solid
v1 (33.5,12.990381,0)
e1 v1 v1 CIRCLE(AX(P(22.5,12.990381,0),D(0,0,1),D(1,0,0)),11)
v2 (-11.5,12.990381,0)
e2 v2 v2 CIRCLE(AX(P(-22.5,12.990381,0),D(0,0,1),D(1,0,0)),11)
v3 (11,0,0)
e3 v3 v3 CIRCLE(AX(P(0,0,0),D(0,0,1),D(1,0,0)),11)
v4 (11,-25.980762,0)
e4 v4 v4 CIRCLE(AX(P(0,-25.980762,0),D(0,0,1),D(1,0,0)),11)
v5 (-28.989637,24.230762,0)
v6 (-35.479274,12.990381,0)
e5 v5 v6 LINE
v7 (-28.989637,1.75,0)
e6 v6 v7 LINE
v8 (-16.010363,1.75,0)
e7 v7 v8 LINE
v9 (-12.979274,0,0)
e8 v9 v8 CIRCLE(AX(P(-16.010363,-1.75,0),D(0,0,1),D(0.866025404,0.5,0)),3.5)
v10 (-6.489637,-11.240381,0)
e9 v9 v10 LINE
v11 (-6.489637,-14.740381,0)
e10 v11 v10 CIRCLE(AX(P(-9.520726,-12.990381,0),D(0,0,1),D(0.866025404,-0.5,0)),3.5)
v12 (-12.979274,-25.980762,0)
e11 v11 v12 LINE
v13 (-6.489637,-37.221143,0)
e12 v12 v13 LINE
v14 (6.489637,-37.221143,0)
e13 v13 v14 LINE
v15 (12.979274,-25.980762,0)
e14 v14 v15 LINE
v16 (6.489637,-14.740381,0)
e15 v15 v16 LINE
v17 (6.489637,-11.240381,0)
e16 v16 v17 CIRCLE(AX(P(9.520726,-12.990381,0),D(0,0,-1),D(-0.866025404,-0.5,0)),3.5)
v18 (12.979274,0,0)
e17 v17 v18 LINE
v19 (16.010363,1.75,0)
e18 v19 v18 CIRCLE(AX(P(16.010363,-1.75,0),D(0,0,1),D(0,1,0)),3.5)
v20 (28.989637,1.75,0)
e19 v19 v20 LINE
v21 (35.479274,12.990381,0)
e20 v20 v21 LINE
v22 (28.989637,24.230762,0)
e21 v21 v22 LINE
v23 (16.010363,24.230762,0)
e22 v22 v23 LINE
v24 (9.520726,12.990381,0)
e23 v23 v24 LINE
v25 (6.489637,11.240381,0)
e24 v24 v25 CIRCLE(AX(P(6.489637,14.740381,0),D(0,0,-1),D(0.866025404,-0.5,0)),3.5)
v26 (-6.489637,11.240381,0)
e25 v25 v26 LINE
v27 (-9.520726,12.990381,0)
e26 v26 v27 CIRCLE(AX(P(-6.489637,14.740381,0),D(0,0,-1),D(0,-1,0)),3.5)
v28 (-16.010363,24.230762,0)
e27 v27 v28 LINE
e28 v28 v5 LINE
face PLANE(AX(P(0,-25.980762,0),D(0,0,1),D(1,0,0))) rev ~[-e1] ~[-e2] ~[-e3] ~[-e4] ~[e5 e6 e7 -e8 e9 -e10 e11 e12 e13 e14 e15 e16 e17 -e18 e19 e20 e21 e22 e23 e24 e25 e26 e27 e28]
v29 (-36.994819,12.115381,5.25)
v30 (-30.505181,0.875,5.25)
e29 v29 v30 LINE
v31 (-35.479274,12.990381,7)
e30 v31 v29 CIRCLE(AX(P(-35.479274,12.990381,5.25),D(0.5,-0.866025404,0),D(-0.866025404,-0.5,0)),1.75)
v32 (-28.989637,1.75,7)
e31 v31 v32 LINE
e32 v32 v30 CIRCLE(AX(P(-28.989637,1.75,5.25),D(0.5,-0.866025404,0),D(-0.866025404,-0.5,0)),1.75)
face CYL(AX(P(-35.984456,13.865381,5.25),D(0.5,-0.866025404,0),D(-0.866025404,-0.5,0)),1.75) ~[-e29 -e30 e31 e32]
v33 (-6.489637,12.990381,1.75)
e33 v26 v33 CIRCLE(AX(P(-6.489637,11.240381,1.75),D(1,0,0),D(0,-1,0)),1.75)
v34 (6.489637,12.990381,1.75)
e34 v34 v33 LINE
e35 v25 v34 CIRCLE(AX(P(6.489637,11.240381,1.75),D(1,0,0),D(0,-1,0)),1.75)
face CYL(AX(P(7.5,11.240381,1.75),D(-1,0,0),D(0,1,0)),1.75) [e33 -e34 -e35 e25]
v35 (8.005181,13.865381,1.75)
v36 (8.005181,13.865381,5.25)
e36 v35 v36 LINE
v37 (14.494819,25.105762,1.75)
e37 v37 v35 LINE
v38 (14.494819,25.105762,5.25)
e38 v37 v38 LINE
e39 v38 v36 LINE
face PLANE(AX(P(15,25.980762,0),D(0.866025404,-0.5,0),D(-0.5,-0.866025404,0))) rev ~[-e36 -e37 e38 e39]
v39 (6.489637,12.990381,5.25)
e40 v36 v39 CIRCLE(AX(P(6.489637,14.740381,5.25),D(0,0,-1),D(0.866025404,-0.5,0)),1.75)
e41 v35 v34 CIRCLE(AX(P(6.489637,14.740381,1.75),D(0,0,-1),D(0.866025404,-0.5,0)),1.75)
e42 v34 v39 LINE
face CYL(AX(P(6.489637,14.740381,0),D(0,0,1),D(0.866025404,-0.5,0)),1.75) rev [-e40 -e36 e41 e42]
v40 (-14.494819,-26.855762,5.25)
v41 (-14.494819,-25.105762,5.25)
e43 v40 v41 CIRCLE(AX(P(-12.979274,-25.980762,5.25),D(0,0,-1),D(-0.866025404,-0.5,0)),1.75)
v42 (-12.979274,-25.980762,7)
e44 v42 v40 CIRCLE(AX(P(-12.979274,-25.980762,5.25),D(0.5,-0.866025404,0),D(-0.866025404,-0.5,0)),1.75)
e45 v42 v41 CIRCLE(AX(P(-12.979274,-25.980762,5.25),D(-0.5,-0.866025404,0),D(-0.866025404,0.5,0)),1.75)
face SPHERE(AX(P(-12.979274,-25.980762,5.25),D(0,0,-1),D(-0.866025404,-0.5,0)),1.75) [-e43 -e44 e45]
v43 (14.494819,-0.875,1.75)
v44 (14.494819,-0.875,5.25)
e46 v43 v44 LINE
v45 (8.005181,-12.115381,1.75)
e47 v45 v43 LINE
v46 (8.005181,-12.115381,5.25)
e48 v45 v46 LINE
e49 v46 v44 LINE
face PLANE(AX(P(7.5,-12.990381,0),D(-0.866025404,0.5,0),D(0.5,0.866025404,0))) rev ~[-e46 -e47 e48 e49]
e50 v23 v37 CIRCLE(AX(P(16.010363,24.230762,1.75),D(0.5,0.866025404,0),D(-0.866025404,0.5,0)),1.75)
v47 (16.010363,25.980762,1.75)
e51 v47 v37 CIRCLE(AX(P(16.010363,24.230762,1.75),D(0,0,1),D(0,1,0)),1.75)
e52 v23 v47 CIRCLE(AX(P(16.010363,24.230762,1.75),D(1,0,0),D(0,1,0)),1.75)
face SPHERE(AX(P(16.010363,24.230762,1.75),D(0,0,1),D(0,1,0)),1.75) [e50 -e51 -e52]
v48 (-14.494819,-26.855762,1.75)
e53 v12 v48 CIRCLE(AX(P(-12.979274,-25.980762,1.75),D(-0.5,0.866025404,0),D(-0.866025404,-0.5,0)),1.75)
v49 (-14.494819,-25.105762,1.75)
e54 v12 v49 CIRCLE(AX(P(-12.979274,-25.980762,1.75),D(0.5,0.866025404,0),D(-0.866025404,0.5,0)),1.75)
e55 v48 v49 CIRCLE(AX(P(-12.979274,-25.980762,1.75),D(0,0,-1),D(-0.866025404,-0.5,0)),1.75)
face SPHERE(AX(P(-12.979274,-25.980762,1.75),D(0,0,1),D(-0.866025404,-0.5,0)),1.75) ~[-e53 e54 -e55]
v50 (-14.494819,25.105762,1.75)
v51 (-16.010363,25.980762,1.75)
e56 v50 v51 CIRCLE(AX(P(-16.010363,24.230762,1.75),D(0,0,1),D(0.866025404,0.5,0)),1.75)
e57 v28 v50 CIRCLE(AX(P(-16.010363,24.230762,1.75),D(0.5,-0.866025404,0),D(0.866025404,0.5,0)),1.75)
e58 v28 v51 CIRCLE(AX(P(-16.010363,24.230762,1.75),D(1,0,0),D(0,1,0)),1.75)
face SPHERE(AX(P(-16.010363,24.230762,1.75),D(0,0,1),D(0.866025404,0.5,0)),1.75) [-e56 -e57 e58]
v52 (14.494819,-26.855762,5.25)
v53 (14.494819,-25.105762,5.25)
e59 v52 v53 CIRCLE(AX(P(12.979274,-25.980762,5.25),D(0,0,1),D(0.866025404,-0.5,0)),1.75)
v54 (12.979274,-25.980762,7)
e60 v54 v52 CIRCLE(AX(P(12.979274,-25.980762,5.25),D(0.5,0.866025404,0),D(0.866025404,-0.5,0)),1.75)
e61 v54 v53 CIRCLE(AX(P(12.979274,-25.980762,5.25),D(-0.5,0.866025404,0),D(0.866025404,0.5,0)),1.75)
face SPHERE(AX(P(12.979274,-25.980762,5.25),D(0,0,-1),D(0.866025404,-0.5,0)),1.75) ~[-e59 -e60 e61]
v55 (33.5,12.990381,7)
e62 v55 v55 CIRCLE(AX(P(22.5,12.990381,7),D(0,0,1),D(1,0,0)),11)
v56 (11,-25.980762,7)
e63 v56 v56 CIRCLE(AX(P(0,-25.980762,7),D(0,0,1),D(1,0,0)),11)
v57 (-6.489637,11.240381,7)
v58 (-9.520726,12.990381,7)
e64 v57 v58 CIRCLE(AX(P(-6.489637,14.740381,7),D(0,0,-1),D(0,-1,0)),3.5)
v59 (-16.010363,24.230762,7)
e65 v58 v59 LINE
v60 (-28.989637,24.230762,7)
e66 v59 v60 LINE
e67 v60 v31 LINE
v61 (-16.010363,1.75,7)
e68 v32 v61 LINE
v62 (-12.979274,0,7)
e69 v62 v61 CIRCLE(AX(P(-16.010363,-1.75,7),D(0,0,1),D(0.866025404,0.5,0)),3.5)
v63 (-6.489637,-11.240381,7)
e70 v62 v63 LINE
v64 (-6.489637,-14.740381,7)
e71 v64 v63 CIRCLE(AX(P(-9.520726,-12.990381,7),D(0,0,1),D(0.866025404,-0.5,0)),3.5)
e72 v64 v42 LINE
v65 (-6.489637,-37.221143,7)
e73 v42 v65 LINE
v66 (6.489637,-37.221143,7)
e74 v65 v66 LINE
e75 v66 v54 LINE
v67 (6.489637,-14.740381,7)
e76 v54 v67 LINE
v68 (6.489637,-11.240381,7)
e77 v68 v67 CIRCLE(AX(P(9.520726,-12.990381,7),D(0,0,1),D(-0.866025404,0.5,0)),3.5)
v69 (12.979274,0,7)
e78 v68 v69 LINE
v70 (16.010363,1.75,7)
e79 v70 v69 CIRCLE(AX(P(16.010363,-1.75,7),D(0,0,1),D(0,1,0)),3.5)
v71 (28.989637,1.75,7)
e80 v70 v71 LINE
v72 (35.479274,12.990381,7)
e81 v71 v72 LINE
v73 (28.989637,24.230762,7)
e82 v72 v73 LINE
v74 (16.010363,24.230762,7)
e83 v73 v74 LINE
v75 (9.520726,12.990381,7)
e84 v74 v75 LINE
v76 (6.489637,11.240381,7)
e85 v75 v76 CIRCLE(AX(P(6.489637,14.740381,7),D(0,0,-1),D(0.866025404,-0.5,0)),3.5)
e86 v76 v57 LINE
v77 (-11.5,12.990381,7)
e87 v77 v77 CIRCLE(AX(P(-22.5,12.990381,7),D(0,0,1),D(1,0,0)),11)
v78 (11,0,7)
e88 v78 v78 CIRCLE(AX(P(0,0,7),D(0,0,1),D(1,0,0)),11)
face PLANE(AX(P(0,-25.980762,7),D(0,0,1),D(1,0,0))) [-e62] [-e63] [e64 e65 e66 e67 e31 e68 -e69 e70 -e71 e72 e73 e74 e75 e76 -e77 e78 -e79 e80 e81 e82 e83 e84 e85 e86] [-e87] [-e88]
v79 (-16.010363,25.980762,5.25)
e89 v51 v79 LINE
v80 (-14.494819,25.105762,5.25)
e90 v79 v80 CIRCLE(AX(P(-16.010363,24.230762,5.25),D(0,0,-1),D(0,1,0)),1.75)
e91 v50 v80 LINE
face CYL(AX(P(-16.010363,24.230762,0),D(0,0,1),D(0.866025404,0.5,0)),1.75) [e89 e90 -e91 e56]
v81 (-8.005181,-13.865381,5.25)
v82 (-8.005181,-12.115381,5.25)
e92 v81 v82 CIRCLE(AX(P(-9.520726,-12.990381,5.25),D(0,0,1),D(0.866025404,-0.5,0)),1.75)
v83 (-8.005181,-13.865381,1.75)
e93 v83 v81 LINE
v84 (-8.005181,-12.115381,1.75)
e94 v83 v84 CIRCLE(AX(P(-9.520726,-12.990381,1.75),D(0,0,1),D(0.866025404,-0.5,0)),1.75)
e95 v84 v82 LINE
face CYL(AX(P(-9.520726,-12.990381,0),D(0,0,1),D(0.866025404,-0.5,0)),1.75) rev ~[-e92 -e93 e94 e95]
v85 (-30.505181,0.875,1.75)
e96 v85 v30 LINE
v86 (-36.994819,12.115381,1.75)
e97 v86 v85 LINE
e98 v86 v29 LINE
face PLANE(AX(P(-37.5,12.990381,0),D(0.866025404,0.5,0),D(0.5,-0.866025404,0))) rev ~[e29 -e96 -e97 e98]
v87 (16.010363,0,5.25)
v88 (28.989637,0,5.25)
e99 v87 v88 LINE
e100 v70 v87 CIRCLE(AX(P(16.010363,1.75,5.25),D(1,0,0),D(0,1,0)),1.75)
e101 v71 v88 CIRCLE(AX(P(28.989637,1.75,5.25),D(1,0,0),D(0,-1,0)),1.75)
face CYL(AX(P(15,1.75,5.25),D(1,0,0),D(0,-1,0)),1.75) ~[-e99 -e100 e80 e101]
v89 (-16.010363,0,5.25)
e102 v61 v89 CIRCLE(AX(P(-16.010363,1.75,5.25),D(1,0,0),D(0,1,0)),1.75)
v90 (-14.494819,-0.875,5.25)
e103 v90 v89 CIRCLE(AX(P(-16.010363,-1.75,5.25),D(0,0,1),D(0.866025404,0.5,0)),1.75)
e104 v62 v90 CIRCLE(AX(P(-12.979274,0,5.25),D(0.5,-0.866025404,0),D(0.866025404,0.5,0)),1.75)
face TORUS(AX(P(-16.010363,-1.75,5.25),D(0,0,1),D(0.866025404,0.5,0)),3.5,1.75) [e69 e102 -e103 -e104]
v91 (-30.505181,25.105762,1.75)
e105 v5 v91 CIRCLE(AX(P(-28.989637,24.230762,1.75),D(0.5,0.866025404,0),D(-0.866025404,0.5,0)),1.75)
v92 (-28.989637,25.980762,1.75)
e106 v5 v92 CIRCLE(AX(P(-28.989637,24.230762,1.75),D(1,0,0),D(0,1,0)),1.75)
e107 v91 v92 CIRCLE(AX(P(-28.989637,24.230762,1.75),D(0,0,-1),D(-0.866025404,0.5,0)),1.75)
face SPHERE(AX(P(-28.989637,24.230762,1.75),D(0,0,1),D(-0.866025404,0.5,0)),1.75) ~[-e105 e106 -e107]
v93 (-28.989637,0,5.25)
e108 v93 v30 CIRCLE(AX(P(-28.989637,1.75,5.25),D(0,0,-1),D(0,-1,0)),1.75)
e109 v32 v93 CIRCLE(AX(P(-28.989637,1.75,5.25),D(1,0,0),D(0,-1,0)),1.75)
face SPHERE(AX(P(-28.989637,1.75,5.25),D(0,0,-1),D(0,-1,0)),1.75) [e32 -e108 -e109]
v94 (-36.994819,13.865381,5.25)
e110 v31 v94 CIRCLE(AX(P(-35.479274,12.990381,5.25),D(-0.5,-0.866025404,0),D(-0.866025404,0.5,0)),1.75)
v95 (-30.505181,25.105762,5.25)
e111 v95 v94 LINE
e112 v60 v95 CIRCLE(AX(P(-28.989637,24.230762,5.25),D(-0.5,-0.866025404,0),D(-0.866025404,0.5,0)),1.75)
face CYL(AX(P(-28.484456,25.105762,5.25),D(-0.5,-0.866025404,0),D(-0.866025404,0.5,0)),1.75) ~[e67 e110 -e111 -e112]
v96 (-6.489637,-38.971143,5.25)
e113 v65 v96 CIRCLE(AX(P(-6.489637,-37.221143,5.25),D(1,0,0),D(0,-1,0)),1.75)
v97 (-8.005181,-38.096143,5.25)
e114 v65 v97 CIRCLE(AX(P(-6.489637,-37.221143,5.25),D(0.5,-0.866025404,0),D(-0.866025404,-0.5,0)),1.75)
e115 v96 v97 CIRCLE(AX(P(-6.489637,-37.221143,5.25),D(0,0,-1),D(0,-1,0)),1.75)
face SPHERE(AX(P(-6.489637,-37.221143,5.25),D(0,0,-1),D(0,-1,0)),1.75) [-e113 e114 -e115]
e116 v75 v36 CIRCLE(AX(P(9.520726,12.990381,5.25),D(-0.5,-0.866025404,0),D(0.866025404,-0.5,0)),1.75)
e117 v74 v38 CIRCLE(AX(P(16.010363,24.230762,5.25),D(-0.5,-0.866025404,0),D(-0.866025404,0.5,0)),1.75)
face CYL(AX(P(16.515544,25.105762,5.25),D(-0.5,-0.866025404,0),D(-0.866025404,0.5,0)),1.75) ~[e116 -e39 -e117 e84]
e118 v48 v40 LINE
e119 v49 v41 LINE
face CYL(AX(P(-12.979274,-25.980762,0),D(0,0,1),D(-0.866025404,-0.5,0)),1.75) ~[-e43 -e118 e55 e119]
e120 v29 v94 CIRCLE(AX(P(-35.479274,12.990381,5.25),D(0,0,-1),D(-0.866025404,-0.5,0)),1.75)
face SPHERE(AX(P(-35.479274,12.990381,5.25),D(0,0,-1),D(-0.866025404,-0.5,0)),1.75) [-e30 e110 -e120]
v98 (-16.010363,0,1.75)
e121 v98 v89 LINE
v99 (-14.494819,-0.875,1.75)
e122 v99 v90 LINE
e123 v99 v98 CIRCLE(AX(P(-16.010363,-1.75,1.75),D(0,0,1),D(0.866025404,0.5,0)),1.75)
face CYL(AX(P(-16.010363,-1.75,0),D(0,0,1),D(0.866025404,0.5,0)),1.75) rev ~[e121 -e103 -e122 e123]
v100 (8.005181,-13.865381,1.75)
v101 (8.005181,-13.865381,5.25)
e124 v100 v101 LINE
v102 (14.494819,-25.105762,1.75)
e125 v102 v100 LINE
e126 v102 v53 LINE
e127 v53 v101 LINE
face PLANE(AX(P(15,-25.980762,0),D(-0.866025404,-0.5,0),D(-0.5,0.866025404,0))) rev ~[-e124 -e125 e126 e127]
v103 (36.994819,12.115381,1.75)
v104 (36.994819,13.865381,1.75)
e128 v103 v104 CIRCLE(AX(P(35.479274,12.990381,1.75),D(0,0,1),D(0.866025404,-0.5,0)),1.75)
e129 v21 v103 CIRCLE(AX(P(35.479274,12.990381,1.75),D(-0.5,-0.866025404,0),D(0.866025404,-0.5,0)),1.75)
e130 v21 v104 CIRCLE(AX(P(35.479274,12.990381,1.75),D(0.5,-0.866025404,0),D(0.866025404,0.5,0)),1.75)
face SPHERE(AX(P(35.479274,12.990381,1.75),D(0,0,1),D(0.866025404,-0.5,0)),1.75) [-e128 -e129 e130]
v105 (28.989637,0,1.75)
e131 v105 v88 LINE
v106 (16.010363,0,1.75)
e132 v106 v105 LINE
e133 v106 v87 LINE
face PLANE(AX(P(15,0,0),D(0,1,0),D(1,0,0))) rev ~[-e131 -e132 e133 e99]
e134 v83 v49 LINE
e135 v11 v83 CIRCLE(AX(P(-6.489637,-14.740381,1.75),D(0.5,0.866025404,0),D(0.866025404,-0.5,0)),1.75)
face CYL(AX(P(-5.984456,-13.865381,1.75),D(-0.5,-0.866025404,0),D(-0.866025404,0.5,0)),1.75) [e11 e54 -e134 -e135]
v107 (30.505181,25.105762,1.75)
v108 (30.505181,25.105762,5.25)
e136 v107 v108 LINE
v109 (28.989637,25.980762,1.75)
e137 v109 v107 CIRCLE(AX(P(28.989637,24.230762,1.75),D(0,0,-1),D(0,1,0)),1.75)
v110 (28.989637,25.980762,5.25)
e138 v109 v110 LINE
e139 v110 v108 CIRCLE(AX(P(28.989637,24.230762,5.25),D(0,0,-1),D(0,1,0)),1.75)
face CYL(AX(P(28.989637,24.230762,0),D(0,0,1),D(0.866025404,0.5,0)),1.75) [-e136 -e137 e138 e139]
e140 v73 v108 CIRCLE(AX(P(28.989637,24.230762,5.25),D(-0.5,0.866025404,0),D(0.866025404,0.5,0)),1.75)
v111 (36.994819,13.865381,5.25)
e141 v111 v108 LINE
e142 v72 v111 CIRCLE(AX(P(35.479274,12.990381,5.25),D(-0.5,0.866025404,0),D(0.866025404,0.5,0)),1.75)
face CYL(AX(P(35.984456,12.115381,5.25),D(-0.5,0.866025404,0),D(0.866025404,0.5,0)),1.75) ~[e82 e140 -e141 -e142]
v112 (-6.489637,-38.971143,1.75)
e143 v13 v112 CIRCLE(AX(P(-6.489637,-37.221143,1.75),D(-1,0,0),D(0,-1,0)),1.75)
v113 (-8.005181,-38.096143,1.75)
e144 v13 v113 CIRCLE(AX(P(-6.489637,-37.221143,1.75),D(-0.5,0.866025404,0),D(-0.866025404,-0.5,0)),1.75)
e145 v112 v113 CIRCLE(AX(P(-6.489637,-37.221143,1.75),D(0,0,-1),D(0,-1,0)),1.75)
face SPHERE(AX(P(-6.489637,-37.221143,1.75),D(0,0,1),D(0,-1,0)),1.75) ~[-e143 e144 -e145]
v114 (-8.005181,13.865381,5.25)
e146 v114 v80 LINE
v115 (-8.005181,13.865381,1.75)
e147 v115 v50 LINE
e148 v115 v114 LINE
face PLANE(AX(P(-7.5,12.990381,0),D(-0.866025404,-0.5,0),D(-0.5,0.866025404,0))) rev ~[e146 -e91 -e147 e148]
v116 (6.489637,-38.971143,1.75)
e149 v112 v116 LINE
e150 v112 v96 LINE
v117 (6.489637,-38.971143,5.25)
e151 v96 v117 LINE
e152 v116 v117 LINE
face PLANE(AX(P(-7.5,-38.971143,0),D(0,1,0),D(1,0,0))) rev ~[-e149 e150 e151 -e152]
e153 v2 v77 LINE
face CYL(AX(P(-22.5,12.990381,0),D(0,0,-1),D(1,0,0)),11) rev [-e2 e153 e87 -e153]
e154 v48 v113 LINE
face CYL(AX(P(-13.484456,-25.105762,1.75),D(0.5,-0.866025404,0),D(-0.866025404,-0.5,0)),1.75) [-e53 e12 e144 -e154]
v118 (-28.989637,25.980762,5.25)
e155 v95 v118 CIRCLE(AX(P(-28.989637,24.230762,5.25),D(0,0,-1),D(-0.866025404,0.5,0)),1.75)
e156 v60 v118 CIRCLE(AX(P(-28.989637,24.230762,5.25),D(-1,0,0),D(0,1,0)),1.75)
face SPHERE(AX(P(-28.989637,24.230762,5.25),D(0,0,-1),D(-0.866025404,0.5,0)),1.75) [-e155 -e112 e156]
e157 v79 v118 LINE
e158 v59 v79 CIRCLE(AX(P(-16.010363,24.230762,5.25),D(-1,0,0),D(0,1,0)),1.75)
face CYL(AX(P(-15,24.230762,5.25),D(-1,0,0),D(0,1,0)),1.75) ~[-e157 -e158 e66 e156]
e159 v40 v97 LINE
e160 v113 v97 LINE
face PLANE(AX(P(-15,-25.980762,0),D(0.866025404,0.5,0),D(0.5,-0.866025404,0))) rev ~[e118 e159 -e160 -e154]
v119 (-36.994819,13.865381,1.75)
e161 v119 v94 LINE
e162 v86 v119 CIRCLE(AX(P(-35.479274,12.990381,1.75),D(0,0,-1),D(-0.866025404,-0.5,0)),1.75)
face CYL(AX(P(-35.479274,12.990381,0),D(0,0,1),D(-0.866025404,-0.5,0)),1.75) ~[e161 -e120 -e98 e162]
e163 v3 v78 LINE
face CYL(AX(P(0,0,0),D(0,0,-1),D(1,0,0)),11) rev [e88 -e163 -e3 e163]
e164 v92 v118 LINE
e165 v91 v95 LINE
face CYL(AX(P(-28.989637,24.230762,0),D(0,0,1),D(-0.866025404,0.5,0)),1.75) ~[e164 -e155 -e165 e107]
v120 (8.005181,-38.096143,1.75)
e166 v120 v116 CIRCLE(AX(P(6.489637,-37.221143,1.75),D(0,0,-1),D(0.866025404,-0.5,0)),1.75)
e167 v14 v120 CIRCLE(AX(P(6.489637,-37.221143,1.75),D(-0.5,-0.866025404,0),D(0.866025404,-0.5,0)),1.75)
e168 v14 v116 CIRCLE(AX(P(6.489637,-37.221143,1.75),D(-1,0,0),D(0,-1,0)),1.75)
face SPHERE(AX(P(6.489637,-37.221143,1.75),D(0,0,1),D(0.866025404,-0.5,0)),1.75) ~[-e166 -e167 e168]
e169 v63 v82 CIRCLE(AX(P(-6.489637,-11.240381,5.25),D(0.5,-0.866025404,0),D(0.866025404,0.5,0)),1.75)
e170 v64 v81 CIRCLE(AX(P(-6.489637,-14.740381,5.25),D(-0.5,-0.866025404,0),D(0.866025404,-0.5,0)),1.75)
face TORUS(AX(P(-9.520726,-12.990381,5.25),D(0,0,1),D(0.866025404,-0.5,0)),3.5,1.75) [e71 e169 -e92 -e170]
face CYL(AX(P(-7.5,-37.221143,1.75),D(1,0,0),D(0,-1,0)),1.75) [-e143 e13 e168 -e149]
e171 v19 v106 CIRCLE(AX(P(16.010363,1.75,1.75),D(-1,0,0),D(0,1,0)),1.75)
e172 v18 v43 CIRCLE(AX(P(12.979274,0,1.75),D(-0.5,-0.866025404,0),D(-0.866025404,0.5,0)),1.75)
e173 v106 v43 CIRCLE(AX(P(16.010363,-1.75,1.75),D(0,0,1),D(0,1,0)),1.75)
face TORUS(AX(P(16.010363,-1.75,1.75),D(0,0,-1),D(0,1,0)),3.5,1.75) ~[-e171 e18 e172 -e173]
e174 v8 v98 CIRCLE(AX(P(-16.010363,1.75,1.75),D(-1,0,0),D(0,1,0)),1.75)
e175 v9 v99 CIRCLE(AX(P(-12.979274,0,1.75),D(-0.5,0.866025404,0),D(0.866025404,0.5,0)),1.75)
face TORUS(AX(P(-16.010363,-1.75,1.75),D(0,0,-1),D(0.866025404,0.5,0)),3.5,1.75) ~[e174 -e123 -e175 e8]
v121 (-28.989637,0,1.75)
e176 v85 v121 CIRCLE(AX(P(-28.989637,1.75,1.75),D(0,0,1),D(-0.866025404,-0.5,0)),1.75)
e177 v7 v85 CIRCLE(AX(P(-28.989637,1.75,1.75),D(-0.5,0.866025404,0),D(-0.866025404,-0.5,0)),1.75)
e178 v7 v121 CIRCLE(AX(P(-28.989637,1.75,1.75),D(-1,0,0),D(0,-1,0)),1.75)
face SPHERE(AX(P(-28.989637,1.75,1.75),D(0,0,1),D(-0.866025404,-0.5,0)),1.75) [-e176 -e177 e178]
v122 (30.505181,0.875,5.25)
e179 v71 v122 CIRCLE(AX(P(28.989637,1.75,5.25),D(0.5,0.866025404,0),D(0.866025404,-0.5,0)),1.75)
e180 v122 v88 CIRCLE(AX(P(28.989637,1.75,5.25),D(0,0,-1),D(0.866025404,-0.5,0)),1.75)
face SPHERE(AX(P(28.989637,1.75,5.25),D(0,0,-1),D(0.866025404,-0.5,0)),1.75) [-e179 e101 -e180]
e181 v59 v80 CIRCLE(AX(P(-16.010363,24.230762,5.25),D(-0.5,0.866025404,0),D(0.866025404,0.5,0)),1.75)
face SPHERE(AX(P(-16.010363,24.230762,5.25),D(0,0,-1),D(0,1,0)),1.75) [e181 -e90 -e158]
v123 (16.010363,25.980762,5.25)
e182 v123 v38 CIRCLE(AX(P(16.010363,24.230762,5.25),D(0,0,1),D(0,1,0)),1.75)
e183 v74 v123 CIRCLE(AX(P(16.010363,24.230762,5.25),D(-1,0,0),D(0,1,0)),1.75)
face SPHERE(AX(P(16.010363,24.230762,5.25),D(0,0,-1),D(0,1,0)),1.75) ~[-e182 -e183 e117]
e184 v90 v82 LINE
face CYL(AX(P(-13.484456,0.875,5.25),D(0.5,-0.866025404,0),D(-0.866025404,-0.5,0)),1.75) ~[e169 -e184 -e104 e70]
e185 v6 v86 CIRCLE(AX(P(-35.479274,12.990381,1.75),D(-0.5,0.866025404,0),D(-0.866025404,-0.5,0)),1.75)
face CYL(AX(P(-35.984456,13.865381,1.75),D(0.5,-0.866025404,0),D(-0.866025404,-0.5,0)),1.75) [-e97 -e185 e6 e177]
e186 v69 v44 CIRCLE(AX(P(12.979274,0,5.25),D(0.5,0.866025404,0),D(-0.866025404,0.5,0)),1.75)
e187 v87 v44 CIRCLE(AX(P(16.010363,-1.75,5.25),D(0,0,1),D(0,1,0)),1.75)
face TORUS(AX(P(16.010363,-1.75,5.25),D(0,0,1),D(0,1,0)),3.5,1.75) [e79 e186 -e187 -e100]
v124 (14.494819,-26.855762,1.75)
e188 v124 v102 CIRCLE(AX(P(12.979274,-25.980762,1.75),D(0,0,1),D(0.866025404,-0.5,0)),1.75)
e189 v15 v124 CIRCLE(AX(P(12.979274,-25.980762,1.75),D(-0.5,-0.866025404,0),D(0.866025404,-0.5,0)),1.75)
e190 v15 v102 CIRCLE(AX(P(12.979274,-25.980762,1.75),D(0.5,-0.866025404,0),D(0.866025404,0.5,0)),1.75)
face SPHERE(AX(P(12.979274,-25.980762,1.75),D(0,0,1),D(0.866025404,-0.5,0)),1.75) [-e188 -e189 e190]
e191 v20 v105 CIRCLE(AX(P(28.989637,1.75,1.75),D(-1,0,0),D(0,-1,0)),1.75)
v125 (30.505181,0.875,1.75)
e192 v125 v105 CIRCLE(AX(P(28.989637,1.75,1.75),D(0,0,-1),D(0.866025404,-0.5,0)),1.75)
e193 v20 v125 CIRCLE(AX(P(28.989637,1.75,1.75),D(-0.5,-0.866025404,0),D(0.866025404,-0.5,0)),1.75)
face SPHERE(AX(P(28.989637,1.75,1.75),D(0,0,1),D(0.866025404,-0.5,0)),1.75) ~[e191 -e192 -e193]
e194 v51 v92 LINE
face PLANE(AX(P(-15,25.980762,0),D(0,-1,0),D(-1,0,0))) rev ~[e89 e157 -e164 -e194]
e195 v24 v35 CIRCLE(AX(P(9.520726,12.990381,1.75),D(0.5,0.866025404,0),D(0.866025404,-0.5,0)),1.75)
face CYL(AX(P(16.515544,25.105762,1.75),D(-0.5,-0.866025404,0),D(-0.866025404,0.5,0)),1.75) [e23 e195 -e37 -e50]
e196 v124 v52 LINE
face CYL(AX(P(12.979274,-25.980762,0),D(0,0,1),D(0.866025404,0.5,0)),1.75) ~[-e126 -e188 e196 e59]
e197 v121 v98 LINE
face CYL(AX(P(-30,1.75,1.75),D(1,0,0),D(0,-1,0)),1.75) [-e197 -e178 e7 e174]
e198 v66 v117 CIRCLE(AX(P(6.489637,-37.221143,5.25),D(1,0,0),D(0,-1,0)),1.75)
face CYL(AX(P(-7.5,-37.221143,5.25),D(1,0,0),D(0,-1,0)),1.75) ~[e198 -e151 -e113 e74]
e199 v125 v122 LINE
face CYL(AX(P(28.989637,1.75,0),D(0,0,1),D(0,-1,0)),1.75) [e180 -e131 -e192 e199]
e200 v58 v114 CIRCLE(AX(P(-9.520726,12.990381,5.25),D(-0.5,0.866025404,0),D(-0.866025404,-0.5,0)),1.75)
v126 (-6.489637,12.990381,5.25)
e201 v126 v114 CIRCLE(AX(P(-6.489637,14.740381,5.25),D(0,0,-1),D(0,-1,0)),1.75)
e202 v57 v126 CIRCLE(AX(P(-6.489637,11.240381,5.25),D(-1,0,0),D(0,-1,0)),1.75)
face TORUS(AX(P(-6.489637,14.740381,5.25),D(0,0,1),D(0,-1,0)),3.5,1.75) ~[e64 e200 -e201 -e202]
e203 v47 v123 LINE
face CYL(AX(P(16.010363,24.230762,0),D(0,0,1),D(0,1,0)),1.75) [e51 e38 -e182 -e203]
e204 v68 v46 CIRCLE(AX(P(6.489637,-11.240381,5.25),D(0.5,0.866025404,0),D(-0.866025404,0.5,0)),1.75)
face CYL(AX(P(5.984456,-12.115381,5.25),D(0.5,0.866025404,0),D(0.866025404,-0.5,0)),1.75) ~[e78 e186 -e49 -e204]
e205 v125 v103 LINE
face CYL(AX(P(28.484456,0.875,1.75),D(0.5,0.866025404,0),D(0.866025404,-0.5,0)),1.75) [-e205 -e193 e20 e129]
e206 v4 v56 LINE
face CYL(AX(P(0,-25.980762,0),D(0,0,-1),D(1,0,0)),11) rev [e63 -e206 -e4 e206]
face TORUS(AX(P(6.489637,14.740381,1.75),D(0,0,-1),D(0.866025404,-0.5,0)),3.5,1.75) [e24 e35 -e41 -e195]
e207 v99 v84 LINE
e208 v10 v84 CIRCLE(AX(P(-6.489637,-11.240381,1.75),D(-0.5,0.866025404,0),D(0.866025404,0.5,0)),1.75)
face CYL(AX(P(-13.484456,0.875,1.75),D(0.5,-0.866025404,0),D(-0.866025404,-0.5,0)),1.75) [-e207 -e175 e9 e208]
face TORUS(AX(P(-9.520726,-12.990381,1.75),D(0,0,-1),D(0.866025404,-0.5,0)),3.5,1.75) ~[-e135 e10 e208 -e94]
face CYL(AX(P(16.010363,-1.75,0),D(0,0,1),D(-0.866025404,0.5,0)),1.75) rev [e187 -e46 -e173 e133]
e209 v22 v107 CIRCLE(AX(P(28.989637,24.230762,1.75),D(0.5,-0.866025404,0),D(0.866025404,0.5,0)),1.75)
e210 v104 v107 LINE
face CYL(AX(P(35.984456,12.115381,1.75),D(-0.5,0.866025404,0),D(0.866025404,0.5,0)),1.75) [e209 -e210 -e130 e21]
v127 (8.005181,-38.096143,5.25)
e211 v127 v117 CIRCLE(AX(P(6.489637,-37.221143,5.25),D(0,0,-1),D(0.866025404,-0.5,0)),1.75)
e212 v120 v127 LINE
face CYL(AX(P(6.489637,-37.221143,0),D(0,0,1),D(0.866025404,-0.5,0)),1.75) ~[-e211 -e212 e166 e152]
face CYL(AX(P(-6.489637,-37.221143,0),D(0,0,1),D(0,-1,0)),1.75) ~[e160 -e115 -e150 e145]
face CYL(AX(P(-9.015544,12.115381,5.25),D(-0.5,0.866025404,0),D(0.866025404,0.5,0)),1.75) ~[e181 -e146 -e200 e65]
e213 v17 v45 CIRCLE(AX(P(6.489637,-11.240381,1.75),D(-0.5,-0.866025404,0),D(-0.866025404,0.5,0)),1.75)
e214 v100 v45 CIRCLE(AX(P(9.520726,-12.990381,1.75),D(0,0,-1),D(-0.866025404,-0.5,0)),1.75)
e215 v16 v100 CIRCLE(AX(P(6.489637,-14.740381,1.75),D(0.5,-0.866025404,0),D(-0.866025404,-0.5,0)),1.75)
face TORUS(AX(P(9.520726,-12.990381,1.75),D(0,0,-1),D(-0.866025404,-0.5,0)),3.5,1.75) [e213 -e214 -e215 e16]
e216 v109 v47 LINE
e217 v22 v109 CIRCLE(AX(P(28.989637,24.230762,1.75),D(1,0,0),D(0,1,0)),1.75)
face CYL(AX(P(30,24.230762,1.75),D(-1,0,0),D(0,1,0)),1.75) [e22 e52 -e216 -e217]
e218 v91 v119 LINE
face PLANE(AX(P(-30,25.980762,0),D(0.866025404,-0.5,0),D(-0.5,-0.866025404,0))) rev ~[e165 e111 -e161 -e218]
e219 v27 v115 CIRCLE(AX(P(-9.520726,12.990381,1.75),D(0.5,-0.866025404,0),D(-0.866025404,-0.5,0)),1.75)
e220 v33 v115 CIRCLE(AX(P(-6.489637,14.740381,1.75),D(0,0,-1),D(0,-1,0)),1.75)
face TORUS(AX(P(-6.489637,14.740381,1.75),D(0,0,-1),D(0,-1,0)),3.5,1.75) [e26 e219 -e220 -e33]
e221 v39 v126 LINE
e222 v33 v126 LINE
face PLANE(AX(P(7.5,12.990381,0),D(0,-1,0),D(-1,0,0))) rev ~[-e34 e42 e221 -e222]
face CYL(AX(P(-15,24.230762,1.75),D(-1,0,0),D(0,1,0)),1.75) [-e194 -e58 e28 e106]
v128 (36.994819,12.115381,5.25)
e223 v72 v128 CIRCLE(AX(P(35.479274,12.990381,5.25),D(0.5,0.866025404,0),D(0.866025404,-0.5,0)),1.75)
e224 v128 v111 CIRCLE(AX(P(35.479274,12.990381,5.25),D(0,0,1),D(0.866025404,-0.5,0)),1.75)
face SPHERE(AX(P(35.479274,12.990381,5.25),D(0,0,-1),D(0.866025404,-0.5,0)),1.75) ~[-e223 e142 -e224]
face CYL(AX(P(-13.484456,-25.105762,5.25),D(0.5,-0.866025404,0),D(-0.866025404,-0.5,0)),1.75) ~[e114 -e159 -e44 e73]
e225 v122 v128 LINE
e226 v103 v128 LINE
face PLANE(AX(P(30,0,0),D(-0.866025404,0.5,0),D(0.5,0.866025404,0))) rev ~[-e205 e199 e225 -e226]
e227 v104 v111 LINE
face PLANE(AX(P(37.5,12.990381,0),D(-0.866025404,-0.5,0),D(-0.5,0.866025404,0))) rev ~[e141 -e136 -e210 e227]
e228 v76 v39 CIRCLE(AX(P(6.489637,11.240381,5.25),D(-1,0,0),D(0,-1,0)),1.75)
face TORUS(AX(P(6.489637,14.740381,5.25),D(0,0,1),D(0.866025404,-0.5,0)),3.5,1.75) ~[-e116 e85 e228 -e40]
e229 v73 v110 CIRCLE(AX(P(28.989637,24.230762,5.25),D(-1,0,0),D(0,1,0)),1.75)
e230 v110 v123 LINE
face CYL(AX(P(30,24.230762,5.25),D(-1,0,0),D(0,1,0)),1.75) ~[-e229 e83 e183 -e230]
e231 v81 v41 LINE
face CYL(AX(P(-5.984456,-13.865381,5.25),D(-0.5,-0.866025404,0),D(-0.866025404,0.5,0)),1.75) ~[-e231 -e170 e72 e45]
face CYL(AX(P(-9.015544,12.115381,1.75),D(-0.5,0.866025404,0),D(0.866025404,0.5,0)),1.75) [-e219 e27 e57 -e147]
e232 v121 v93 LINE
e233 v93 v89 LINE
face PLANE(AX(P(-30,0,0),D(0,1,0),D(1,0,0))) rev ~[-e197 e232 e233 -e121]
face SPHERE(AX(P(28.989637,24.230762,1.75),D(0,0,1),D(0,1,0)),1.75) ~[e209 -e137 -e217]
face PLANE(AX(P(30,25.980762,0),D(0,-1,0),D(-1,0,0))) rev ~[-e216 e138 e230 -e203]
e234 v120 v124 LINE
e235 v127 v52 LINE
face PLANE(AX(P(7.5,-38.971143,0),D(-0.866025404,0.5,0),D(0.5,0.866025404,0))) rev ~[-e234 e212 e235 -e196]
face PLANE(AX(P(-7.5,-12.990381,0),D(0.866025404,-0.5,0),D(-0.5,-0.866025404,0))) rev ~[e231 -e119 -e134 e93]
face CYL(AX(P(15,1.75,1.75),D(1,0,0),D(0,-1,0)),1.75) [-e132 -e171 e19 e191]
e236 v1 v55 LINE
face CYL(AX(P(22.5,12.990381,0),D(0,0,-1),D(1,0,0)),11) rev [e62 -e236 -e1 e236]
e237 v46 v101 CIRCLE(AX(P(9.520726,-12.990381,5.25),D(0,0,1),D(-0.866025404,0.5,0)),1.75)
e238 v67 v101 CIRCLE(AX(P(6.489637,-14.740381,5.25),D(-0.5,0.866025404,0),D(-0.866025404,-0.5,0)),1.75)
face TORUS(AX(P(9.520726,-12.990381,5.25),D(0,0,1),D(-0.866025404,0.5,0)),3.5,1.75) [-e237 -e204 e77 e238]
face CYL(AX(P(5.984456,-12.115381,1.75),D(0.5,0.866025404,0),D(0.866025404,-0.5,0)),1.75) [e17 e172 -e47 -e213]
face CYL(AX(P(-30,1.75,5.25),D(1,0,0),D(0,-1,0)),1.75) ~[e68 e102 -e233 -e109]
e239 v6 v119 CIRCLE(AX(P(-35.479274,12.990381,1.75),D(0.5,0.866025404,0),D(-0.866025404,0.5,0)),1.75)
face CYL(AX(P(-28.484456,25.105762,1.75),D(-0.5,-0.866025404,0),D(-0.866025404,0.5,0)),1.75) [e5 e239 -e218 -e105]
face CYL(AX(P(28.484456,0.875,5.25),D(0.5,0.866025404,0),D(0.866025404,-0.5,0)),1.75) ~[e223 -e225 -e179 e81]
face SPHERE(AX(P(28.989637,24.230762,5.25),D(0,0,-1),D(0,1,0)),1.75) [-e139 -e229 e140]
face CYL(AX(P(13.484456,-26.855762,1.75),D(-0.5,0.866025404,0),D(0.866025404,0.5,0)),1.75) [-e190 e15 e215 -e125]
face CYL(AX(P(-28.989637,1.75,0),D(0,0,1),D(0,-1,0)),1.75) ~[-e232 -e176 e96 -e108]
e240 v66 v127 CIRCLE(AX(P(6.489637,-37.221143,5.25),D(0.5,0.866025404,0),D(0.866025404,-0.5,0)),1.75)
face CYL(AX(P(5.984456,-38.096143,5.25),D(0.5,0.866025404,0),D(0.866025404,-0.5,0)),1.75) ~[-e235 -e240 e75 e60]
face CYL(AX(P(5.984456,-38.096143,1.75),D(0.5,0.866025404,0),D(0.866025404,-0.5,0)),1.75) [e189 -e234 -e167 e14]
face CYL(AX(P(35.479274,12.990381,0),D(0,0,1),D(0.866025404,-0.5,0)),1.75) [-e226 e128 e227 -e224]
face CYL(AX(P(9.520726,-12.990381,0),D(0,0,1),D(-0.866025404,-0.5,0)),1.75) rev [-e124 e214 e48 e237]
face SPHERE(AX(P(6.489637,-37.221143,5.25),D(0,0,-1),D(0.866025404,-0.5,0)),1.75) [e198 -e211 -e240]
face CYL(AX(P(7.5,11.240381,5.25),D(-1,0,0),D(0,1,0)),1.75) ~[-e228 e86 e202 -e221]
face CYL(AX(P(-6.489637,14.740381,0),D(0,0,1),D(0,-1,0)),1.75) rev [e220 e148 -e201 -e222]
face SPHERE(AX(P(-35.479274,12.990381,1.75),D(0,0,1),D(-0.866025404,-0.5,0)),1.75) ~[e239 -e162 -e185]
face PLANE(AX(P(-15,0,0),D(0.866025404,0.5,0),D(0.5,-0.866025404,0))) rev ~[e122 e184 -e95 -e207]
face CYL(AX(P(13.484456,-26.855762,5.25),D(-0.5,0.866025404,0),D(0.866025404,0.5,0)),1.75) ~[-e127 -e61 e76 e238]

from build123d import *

# Parameters (mm, degrees)
F0_R     = 11
F1_DEPTH = 7
F2_R     = 1.75


with BuildPart() as f1:
    # F0 (on Top) → F1 (new body)
    with BuildSketch(Plane.XY):
        Polygon((15, -25.9807621135), (7.5, -12.9903810568), (-7.5, -12.9903810568), (-15, -25.9807621135), (-7.5, -38.9711431703), (7.5, -38.9711431703), align=None)
        with Locations((0, -25.9807621135)):
            Circle(F0_R, mode=Mode.SUBTRACT)
        Polygon((-7.5, -12.9903810568), (7.5, -12.9903810568), (15, 0), (7.5, 12.9903810568), (-7.5, 12.9903810568), (-15, 0), align=None)
        Circle(F0_R, mode=Mode.SUBTRACT)
        Polygon((7.5, 12.9903810568), (15, 0), (30, 0), (37.5, 12.9903810568), (30, 25.9807621135), (15, 25.9807621135), align=None)
        with Locations((22.5, 12.9903810568)):
            Circle(F0_R, mode=Mode.SUBTRACT)
        Polygon((-30, 0), (-15, 0), (-7.5, 12.9903810568), (-15, 25.9807621135), (-30, 25.9807621135), (-37.5, 12.9903810568), align=None)
        with Locations((-22.5, 12.9903810568)):
            Circle(F0_R, mode=Mode.SUBTRACT)
    extrude(amount=F1_DEPTH)

    # F2
    f2_edges = [f1.edges().sort_by_distance(p)[0] for p in [
        (7.5, -38.971143, 3.5),
        (15, -25.980762, 3.5),
        (11.25, -32.475953, 0),
        (11.25, -32.475953, 7),
        (0, -38.971143, 7),
        (11.25, -19.485572, 7),
        (11.25, -19.485572, 0),
        (11.25, -6.495191, 0),
        (7.5, -12.990381, 3.5),
        (11.25, -6.495191, 7),
        (15, 0, 3.5),
        (22.5, 0, 0),
        (22.5, 0, 7),
        (30, 0, 3.5),
        (33.75, 6.495191, 0),
        (33.75, 6.495191, 7),
        (33.75, 19.485572, 0),
        (33.75, 19.485572, 7),
        (37.5, 12.990381, 3.5),
        (30, 25.980762, 3.5),
        (22.5, 25.980762, 7),
        (22.5, 25.980762, 0),
        (11.25, 19.485572, 7),
        (11.25, 19.485572, 0),
        (0, 12.990381, 7),
        (0, 12.990381, 0),
        (-11.25, 19.485572, 7),
        (-11.25, 19.485572, 0),
        (-22.5, 25.980762, 0),
        (-15, 25.980762, 3.5),
        (-22.5, 25.980762, 7),
        (-30, 25.980762, 3.5),
        (-33.75, 19.485572, 7),
        (-33.75, 19.485572, 0),
        (-37.5, 12.990381, 3.5),
        (-33.75, 6.495191, 7),
        (-33.75, 6.495191, 0),
        (-22.5, 0, 0),
        (-30, 0, 3.5),
        (-22.5, 0, 7),
        (-15, 0, 3.5),
        (-11.25, -6.495191, 7),
        (-7.5, -12.990381, 3.5),
        (-11.25, -19.485572, 0),
        (-11.25, -19.485572, 7),
        (-15, -25.980762, 3.5),
        (-11.25, -32.475953, 7),
        (-11.25, -32.475953, 0),
        (-7.5, -38.971143, 3.5),
        (0, -38.971143, 0),
        (-7.5, 12.990381, 3.5),
        (7.5, 12.990381, 3.5),
        (15, 25.980762, 3.5),
        (-11.25, -6.495191, 0),
    ]]
    fillet(f2_edges, radius=F2_R)


solid = f1.part
